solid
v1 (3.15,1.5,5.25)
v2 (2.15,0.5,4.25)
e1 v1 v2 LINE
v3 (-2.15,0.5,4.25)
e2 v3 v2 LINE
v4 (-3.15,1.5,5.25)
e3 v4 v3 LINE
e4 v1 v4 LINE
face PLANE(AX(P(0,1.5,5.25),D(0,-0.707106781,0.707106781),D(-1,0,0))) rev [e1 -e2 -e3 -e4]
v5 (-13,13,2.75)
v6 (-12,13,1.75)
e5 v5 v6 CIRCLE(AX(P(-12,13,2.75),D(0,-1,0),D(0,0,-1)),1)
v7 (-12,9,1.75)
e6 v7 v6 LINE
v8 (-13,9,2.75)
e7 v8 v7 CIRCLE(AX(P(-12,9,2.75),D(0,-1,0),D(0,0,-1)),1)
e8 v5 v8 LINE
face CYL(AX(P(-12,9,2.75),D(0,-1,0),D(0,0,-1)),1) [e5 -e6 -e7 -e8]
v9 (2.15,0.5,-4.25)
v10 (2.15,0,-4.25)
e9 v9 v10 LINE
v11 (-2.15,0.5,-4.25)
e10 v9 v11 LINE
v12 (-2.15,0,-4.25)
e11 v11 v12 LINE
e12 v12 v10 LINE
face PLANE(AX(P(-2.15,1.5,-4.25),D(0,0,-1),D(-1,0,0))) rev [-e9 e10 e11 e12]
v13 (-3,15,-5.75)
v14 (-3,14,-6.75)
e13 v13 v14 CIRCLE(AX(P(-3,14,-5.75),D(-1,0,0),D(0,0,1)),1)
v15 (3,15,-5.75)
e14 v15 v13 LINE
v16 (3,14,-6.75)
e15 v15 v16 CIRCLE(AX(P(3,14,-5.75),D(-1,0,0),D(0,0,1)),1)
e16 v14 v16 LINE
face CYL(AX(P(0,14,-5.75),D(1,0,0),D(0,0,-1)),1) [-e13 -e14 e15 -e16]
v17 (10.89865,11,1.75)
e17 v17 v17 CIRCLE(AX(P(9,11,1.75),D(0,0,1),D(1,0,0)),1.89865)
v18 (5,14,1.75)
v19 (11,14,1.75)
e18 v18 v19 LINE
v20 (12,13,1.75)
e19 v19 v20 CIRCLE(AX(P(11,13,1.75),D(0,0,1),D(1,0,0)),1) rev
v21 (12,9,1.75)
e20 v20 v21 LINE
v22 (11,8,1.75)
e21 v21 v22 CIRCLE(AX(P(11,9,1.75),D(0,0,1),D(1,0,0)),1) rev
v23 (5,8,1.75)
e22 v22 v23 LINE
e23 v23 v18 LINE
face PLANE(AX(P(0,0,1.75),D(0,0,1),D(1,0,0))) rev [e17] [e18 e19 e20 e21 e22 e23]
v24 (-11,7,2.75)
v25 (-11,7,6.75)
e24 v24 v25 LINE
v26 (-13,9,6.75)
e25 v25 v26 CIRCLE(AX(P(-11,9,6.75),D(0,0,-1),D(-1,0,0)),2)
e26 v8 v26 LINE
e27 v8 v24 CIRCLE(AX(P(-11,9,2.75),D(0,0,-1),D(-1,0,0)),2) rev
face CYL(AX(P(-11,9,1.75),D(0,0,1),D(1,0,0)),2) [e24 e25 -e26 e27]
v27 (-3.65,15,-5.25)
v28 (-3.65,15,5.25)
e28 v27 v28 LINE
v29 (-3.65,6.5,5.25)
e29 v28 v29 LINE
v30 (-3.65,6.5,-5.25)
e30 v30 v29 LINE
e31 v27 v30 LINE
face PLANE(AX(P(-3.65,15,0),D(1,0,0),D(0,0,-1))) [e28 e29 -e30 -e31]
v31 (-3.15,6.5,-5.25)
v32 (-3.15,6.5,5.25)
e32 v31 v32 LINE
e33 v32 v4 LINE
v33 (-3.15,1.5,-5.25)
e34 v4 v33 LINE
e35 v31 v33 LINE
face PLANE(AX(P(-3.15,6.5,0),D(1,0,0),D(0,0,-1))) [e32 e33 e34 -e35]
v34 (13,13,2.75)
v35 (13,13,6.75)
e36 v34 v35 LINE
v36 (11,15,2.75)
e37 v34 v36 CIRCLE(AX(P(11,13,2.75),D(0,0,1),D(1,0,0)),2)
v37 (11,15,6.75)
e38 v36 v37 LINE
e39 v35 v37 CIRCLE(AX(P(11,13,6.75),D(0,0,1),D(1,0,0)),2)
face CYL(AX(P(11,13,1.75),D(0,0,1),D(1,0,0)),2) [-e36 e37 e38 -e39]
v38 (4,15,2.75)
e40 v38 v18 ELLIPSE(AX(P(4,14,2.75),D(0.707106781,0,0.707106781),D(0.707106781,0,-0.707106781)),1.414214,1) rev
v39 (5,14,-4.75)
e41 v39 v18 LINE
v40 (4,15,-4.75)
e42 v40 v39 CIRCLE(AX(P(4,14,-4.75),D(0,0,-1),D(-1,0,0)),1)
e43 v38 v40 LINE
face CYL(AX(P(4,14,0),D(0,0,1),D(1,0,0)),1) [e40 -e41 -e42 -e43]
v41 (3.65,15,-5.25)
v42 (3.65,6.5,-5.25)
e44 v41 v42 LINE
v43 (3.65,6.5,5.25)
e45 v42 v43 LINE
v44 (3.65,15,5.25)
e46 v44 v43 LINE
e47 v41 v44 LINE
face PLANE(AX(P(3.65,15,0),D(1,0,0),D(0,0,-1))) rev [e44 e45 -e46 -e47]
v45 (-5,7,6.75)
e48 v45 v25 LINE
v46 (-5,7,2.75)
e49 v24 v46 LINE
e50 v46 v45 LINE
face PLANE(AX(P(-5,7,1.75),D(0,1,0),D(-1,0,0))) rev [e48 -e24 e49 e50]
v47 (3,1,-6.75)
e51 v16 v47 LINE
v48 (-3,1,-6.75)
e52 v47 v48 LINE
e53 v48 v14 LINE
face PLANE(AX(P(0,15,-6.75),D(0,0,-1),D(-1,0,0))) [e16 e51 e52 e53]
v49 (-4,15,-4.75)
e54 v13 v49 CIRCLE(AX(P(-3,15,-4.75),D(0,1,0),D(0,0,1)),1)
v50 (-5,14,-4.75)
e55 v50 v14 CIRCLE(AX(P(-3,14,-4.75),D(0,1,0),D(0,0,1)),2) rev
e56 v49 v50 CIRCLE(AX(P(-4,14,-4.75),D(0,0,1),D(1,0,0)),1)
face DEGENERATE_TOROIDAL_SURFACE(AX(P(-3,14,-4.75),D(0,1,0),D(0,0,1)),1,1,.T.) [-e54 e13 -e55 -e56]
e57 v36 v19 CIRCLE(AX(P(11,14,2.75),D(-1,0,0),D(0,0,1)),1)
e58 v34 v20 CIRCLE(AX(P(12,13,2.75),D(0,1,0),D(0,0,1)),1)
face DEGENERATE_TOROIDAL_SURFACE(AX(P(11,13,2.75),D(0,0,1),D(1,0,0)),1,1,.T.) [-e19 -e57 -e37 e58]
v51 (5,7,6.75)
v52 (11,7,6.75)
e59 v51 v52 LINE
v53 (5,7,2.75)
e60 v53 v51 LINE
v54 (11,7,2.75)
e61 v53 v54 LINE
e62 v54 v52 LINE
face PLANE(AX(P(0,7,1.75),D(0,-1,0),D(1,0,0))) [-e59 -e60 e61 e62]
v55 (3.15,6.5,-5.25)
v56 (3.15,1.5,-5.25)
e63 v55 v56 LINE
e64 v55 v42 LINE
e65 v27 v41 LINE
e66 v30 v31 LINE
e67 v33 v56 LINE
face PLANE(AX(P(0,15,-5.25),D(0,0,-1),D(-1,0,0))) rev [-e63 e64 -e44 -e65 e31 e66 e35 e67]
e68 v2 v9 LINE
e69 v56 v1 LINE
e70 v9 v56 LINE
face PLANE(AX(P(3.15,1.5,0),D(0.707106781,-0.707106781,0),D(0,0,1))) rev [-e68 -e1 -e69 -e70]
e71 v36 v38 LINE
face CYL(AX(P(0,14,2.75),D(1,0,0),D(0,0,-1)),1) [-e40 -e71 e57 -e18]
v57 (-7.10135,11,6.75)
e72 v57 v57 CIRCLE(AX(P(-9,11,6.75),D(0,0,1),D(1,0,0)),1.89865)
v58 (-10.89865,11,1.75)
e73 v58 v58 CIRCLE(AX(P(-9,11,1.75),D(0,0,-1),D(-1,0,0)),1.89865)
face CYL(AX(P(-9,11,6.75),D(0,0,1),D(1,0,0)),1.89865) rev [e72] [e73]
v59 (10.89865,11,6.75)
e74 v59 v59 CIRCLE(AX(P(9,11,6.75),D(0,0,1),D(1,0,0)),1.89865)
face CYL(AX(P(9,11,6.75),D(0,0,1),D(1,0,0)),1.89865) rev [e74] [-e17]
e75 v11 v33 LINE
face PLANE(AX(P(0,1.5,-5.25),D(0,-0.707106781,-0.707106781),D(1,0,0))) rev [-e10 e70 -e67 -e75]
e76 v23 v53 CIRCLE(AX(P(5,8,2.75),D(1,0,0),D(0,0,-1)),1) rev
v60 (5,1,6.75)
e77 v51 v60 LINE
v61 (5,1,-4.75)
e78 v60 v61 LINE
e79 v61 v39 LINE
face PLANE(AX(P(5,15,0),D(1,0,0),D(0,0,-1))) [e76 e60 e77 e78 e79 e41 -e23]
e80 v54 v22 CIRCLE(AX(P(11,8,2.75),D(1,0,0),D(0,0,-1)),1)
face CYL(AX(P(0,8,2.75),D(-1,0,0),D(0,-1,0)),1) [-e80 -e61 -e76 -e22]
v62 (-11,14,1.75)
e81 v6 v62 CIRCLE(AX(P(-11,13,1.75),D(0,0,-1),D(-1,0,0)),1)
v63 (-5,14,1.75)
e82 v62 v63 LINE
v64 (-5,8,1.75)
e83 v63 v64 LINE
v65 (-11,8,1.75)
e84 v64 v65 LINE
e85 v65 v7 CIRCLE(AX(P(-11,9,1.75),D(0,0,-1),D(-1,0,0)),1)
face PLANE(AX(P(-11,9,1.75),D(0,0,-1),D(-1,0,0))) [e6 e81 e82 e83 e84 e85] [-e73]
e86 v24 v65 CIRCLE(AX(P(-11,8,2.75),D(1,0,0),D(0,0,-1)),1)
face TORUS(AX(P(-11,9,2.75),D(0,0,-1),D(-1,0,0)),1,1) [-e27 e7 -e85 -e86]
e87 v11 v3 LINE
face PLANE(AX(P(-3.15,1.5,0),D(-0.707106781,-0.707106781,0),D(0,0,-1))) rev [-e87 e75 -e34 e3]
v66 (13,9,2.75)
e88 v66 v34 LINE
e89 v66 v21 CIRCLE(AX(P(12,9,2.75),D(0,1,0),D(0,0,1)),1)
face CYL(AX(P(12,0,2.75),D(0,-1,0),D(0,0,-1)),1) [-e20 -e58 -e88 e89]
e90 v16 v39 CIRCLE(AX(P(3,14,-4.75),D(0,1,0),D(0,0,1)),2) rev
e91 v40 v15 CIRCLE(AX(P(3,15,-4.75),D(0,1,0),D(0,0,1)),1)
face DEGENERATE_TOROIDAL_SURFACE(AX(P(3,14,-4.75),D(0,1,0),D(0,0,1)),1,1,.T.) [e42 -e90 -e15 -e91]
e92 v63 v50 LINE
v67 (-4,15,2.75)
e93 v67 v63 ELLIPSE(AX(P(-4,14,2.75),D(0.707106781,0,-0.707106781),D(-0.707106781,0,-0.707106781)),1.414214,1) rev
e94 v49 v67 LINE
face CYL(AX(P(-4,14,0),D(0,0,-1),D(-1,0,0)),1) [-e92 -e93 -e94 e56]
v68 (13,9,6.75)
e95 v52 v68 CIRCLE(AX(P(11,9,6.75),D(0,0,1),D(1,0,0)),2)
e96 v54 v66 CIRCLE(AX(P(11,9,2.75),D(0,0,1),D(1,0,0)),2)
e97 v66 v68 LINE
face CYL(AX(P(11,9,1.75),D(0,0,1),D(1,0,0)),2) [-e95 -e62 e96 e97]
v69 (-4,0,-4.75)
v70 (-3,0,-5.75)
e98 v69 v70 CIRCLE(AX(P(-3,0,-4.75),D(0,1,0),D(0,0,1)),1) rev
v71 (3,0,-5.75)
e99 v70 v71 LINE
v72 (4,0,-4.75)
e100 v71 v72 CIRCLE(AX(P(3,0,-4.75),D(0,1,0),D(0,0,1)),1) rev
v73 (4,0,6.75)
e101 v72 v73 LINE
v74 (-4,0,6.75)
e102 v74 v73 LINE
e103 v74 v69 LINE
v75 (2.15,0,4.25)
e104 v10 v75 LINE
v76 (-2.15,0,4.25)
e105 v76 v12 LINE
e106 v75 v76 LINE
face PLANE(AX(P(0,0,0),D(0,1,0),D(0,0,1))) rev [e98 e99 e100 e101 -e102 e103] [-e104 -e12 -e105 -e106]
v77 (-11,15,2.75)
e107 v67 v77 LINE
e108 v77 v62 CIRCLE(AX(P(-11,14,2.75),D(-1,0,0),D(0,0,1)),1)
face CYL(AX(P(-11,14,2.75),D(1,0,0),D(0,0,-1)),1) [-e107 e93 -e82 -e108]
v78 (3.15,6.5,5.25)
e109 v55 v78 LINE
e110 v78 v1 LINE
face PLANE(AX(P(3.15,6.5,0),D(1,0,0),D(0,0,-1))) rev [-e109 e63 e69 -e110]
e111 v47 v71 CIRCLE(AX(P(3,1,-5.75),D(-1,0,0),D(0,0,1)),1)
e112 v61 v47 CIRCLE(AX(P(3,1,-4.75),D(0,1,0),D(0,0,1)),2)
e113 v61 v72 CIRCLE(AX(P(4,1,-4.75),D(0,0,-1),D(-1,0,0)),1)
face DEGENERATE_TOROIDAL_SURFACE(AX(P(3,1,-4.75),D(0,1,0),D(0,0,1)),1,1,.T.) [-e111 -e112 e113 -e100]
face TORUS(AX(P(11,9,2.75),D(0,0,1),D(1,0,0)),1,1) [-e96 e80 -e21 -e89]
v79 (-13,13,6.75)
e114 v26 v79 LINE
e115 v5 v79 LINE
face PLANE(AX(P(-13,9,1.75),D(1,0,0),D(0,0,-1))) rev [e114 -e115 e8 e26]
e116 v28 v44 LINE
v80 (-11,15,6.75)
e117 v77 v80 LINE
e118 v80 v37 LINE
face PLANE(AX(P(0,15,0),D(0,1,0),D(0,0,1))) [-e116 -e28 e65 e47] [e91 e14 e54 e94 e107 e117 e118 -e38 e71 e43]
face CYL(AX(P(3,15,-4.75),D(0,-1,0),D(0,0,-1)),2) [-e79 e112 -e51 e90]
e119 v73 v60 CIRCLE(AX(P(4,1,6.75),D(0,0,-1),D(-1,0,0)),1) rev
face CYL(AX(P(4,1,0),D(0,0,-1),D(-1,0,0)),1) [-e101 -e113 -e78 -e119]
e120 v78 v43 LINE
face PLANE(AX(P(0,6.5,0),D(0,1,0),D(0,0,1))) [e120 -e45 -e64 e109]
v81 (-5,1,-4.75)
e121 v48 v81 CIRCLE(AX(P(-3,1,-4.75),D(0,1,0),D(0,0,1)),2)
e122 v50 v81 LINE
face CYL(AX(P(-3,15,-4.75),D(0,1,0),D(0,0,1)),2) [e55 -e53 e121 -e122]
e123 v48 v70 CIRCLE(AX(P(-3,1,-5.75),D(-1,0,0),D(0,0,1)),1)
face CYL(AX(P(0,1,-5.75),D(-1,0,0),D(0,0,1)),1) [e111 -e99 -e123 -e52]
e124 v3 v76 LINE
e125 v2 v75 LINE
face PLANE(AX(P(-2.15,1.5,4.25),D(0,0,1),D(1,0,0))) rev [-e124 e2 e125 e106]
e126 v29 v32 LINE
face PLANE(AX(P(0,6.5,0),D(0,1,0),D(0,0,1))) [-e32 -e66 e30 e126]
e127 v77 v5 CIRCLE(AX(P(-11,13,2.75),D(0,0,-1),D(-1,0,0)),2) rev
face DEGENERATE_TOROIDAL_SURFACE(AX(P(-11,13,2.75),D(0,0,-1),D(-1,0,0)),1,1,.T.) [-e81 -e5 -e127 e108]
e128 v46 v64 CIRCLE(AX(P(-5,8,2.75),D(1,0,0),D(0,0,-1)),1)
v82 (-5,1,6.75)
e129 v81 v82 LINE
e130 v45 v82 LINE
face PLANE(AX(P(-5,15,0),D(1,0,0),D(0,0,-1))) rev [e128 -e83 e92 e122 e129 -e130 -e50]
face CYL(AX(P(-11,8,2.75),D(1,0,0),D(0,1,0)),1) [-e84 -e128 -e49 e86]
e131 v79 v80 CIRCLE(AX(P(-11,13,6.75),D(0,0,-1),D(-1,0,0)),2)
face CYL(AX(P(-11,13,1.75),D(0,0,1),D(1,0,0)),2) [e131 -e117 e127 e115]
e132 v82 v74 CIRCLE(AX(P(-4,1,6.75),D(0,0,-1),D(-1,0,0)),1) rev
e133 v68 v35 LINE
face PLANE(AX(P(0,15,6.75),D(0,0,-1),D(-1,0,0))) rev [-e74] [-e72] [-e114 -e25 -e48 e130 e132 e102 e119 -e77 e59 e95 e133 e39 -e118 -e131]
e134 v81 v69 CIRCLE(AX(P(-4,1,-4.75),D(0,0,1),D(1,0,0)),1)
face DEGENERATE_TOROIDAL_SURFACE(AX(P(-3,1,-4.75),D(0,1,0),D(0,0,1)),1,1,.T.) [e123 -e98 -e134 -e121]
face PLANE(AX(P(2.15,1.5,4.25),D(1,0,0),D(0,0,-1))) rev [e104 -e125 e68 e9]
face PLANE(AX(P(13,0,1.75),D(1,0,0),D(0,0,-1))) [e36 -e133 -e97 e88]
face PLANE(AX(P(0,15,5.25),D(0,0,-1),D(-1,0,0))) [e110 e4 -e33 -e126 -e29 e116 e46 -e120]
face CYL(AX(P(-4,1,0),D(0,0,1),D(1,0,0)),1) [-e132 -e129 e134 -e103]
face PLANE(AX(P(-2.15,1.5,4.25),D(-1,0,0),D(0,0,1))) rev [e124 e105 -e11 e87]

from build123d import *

# Parameters (mm, degrees)
SKETCH1_W             = 10
SKETCH1_H             = 13.5
SKETCH1_W_2           = 7.3
SKETCH1_H_2           = 10.5
BOSS_EXTRUDE1_DEPTH   = 15
SKETCH1_3_W           = 0.5
SKETCH1_3_H           = 10.5
BOSS_EXTRUDE2_DEPTH   = 6.5
BOSS_EXTRUDE3_DEPTH   = 5
F_6_CLEARANCE_HOLE1_D = 3.7973
SKETCH5_W             = 6.3
SKETCH5_H             = 10.5
SKETCH5_W_2           = 4.3
SKETCH5_H_2           = 8.5
BOSS_EXTRUDE4_DEPTH   = 1.5
FILLET1_R             = 2
FILLET2_SIZE          = 1
FILLET3_R             = 1


with BuildPart() as part:
    # Sketch1 → Boss-Extrude1 (new body)
    with BuildSketch(Plane(origin=(0, 0, 0), x_dir=(1, 0, 0), z_dir=(0, 1, 0))):
        Rectangle(SKETCH1_W, SKETCH1_H)
        Rectangle(SKETCH1_W_2, SKETCH1_H_2, mode=Mode.SUBTRACT)
    extrude(amount=BOSS_EXTRUDE1_DEPTH)

    # Sketch1<3> → Boss-Extrude2 (add)
    with BuildSketch(Plane(origin=(0, 0, 0), x_dir=(1, 0, 0), z_dir=(0, 1, 0))):
        with Locations((-3.4, 0)):
            Rectangle(SKETCH1_3_W, SKETCH1_3_H)
        with Locations((3.4, 0)):
            Rectangle(SKETCH1_3_W, SKETCH1_3_H)
    extrude(amount=BOSS_EXTRUDE2_DEPTH)

    # Sketch2 → Boss-Extrude3 (add)
    with BuildSketch(Plane.XY.offset(6.75)):
        with BuildLine():
            ThreePointArc((13, 13), (12.414213562, 14.414213562), (11, 15))
            Line((11, 15), (5, 15))
            Line((5, 15), (5, 7))
            Line((5, 7), (11, 7))
            ThreePointArc((11, 7), (12.414213562, 7.585786438), (13, 9))
            Line((13, 9), (13, 13))
        make_face()
        with BuildLine():
            Line((-13, 9), (-13, 13))
            ThreePointArc((-13, 13), (-12.414213562, 14.414213562), (-11, 15))
            Line((-11, 15), (-5, 15))
            Line((-5, 15), (-5, 7))
            Line((-5, 7), (-11, 7))
            ThreePointArc((-11, 7), (-12.414213562, 7.585786438), (-13, 9))
        make_face()
    extrude(amount=-BOSS_EXTRUDE3_DEPTH)

    # #6 Clearance Hole1 (through all)
    with Locations(Plane.XY.offset(6.75)):
        with Locations((-9, 11), (9, 11)):
            Hole(F_6_CLEARANCE_HOLE1_D / 2)

    # Sketch5 → Boss-Extrude4 (add)
    with BuildSketch(Plane.XZ):
        Rectangle(SKETCH5_W, SKETCH5_H)
        Rectangle(SKETCH5_W_2, SKETCH5_H_2, mode=Mode.SUBTRACT)
    extrude(amount=-BOSS_EXTRUDE4_DEPTH)

    # Fillet1
    fillet1_edges = [part.edges().sort_by_distance(p)[0] for p in [
        (-5, 7.5, -6.75),
        (5, 7.5, -6.75),
    ]]
    fillet(fillet1_edges, radius=FILLET1_R)

    # Fillet2
    fillet2_edges = [part.edges().sort_by_distance(p)[0] for p in [
        (0, 1.5, -4.25),
        (2.15, 1.5, 0),
        (0, 1.5, 4.25),
        (-2.15, 1.5, 0),
    ]]
    chamfer(fillet2_edges, length=FILLET2_SIZE - 0.0001)  # a hair under: the kernel refuses the full size

    # Fillet3
    fillet3_edges = [part.edges().sort_by_distance(p)[0] for p in [
        (0, 0, -6.75),
        (0, 15, -6.75),
        (5, 0, 1),
        (-5, 0, 1),
        (-4.414213562, 0, -6.164213562),
        (4.414213562, 0, -6.164213562),
        (5, 15, -1.5),
        (-5, 15, -1.5),
        (-4.414213562, 15, -6.164213562),
        (4.414213562, 15, -6.164213562),
        (8, 7, 1.75),
        (8, 15, 1.75),
        (12.414213562, 14.414213562, 1.75),
        (13, 11, 1.75),
        (12.414213562, 7.585786438, 1.75),
        (-12.414213562, 7.585786438, 1.75),
        (-13, 11, 1.75),
        (-12.414213562, 14.414213562, 1.75),
        (-8, 15, 1.75),
        (-8, 7, 1.75),
    ]]
    fillet(fillet3_edges, radius=FILLET3_R)


solid = part.part
